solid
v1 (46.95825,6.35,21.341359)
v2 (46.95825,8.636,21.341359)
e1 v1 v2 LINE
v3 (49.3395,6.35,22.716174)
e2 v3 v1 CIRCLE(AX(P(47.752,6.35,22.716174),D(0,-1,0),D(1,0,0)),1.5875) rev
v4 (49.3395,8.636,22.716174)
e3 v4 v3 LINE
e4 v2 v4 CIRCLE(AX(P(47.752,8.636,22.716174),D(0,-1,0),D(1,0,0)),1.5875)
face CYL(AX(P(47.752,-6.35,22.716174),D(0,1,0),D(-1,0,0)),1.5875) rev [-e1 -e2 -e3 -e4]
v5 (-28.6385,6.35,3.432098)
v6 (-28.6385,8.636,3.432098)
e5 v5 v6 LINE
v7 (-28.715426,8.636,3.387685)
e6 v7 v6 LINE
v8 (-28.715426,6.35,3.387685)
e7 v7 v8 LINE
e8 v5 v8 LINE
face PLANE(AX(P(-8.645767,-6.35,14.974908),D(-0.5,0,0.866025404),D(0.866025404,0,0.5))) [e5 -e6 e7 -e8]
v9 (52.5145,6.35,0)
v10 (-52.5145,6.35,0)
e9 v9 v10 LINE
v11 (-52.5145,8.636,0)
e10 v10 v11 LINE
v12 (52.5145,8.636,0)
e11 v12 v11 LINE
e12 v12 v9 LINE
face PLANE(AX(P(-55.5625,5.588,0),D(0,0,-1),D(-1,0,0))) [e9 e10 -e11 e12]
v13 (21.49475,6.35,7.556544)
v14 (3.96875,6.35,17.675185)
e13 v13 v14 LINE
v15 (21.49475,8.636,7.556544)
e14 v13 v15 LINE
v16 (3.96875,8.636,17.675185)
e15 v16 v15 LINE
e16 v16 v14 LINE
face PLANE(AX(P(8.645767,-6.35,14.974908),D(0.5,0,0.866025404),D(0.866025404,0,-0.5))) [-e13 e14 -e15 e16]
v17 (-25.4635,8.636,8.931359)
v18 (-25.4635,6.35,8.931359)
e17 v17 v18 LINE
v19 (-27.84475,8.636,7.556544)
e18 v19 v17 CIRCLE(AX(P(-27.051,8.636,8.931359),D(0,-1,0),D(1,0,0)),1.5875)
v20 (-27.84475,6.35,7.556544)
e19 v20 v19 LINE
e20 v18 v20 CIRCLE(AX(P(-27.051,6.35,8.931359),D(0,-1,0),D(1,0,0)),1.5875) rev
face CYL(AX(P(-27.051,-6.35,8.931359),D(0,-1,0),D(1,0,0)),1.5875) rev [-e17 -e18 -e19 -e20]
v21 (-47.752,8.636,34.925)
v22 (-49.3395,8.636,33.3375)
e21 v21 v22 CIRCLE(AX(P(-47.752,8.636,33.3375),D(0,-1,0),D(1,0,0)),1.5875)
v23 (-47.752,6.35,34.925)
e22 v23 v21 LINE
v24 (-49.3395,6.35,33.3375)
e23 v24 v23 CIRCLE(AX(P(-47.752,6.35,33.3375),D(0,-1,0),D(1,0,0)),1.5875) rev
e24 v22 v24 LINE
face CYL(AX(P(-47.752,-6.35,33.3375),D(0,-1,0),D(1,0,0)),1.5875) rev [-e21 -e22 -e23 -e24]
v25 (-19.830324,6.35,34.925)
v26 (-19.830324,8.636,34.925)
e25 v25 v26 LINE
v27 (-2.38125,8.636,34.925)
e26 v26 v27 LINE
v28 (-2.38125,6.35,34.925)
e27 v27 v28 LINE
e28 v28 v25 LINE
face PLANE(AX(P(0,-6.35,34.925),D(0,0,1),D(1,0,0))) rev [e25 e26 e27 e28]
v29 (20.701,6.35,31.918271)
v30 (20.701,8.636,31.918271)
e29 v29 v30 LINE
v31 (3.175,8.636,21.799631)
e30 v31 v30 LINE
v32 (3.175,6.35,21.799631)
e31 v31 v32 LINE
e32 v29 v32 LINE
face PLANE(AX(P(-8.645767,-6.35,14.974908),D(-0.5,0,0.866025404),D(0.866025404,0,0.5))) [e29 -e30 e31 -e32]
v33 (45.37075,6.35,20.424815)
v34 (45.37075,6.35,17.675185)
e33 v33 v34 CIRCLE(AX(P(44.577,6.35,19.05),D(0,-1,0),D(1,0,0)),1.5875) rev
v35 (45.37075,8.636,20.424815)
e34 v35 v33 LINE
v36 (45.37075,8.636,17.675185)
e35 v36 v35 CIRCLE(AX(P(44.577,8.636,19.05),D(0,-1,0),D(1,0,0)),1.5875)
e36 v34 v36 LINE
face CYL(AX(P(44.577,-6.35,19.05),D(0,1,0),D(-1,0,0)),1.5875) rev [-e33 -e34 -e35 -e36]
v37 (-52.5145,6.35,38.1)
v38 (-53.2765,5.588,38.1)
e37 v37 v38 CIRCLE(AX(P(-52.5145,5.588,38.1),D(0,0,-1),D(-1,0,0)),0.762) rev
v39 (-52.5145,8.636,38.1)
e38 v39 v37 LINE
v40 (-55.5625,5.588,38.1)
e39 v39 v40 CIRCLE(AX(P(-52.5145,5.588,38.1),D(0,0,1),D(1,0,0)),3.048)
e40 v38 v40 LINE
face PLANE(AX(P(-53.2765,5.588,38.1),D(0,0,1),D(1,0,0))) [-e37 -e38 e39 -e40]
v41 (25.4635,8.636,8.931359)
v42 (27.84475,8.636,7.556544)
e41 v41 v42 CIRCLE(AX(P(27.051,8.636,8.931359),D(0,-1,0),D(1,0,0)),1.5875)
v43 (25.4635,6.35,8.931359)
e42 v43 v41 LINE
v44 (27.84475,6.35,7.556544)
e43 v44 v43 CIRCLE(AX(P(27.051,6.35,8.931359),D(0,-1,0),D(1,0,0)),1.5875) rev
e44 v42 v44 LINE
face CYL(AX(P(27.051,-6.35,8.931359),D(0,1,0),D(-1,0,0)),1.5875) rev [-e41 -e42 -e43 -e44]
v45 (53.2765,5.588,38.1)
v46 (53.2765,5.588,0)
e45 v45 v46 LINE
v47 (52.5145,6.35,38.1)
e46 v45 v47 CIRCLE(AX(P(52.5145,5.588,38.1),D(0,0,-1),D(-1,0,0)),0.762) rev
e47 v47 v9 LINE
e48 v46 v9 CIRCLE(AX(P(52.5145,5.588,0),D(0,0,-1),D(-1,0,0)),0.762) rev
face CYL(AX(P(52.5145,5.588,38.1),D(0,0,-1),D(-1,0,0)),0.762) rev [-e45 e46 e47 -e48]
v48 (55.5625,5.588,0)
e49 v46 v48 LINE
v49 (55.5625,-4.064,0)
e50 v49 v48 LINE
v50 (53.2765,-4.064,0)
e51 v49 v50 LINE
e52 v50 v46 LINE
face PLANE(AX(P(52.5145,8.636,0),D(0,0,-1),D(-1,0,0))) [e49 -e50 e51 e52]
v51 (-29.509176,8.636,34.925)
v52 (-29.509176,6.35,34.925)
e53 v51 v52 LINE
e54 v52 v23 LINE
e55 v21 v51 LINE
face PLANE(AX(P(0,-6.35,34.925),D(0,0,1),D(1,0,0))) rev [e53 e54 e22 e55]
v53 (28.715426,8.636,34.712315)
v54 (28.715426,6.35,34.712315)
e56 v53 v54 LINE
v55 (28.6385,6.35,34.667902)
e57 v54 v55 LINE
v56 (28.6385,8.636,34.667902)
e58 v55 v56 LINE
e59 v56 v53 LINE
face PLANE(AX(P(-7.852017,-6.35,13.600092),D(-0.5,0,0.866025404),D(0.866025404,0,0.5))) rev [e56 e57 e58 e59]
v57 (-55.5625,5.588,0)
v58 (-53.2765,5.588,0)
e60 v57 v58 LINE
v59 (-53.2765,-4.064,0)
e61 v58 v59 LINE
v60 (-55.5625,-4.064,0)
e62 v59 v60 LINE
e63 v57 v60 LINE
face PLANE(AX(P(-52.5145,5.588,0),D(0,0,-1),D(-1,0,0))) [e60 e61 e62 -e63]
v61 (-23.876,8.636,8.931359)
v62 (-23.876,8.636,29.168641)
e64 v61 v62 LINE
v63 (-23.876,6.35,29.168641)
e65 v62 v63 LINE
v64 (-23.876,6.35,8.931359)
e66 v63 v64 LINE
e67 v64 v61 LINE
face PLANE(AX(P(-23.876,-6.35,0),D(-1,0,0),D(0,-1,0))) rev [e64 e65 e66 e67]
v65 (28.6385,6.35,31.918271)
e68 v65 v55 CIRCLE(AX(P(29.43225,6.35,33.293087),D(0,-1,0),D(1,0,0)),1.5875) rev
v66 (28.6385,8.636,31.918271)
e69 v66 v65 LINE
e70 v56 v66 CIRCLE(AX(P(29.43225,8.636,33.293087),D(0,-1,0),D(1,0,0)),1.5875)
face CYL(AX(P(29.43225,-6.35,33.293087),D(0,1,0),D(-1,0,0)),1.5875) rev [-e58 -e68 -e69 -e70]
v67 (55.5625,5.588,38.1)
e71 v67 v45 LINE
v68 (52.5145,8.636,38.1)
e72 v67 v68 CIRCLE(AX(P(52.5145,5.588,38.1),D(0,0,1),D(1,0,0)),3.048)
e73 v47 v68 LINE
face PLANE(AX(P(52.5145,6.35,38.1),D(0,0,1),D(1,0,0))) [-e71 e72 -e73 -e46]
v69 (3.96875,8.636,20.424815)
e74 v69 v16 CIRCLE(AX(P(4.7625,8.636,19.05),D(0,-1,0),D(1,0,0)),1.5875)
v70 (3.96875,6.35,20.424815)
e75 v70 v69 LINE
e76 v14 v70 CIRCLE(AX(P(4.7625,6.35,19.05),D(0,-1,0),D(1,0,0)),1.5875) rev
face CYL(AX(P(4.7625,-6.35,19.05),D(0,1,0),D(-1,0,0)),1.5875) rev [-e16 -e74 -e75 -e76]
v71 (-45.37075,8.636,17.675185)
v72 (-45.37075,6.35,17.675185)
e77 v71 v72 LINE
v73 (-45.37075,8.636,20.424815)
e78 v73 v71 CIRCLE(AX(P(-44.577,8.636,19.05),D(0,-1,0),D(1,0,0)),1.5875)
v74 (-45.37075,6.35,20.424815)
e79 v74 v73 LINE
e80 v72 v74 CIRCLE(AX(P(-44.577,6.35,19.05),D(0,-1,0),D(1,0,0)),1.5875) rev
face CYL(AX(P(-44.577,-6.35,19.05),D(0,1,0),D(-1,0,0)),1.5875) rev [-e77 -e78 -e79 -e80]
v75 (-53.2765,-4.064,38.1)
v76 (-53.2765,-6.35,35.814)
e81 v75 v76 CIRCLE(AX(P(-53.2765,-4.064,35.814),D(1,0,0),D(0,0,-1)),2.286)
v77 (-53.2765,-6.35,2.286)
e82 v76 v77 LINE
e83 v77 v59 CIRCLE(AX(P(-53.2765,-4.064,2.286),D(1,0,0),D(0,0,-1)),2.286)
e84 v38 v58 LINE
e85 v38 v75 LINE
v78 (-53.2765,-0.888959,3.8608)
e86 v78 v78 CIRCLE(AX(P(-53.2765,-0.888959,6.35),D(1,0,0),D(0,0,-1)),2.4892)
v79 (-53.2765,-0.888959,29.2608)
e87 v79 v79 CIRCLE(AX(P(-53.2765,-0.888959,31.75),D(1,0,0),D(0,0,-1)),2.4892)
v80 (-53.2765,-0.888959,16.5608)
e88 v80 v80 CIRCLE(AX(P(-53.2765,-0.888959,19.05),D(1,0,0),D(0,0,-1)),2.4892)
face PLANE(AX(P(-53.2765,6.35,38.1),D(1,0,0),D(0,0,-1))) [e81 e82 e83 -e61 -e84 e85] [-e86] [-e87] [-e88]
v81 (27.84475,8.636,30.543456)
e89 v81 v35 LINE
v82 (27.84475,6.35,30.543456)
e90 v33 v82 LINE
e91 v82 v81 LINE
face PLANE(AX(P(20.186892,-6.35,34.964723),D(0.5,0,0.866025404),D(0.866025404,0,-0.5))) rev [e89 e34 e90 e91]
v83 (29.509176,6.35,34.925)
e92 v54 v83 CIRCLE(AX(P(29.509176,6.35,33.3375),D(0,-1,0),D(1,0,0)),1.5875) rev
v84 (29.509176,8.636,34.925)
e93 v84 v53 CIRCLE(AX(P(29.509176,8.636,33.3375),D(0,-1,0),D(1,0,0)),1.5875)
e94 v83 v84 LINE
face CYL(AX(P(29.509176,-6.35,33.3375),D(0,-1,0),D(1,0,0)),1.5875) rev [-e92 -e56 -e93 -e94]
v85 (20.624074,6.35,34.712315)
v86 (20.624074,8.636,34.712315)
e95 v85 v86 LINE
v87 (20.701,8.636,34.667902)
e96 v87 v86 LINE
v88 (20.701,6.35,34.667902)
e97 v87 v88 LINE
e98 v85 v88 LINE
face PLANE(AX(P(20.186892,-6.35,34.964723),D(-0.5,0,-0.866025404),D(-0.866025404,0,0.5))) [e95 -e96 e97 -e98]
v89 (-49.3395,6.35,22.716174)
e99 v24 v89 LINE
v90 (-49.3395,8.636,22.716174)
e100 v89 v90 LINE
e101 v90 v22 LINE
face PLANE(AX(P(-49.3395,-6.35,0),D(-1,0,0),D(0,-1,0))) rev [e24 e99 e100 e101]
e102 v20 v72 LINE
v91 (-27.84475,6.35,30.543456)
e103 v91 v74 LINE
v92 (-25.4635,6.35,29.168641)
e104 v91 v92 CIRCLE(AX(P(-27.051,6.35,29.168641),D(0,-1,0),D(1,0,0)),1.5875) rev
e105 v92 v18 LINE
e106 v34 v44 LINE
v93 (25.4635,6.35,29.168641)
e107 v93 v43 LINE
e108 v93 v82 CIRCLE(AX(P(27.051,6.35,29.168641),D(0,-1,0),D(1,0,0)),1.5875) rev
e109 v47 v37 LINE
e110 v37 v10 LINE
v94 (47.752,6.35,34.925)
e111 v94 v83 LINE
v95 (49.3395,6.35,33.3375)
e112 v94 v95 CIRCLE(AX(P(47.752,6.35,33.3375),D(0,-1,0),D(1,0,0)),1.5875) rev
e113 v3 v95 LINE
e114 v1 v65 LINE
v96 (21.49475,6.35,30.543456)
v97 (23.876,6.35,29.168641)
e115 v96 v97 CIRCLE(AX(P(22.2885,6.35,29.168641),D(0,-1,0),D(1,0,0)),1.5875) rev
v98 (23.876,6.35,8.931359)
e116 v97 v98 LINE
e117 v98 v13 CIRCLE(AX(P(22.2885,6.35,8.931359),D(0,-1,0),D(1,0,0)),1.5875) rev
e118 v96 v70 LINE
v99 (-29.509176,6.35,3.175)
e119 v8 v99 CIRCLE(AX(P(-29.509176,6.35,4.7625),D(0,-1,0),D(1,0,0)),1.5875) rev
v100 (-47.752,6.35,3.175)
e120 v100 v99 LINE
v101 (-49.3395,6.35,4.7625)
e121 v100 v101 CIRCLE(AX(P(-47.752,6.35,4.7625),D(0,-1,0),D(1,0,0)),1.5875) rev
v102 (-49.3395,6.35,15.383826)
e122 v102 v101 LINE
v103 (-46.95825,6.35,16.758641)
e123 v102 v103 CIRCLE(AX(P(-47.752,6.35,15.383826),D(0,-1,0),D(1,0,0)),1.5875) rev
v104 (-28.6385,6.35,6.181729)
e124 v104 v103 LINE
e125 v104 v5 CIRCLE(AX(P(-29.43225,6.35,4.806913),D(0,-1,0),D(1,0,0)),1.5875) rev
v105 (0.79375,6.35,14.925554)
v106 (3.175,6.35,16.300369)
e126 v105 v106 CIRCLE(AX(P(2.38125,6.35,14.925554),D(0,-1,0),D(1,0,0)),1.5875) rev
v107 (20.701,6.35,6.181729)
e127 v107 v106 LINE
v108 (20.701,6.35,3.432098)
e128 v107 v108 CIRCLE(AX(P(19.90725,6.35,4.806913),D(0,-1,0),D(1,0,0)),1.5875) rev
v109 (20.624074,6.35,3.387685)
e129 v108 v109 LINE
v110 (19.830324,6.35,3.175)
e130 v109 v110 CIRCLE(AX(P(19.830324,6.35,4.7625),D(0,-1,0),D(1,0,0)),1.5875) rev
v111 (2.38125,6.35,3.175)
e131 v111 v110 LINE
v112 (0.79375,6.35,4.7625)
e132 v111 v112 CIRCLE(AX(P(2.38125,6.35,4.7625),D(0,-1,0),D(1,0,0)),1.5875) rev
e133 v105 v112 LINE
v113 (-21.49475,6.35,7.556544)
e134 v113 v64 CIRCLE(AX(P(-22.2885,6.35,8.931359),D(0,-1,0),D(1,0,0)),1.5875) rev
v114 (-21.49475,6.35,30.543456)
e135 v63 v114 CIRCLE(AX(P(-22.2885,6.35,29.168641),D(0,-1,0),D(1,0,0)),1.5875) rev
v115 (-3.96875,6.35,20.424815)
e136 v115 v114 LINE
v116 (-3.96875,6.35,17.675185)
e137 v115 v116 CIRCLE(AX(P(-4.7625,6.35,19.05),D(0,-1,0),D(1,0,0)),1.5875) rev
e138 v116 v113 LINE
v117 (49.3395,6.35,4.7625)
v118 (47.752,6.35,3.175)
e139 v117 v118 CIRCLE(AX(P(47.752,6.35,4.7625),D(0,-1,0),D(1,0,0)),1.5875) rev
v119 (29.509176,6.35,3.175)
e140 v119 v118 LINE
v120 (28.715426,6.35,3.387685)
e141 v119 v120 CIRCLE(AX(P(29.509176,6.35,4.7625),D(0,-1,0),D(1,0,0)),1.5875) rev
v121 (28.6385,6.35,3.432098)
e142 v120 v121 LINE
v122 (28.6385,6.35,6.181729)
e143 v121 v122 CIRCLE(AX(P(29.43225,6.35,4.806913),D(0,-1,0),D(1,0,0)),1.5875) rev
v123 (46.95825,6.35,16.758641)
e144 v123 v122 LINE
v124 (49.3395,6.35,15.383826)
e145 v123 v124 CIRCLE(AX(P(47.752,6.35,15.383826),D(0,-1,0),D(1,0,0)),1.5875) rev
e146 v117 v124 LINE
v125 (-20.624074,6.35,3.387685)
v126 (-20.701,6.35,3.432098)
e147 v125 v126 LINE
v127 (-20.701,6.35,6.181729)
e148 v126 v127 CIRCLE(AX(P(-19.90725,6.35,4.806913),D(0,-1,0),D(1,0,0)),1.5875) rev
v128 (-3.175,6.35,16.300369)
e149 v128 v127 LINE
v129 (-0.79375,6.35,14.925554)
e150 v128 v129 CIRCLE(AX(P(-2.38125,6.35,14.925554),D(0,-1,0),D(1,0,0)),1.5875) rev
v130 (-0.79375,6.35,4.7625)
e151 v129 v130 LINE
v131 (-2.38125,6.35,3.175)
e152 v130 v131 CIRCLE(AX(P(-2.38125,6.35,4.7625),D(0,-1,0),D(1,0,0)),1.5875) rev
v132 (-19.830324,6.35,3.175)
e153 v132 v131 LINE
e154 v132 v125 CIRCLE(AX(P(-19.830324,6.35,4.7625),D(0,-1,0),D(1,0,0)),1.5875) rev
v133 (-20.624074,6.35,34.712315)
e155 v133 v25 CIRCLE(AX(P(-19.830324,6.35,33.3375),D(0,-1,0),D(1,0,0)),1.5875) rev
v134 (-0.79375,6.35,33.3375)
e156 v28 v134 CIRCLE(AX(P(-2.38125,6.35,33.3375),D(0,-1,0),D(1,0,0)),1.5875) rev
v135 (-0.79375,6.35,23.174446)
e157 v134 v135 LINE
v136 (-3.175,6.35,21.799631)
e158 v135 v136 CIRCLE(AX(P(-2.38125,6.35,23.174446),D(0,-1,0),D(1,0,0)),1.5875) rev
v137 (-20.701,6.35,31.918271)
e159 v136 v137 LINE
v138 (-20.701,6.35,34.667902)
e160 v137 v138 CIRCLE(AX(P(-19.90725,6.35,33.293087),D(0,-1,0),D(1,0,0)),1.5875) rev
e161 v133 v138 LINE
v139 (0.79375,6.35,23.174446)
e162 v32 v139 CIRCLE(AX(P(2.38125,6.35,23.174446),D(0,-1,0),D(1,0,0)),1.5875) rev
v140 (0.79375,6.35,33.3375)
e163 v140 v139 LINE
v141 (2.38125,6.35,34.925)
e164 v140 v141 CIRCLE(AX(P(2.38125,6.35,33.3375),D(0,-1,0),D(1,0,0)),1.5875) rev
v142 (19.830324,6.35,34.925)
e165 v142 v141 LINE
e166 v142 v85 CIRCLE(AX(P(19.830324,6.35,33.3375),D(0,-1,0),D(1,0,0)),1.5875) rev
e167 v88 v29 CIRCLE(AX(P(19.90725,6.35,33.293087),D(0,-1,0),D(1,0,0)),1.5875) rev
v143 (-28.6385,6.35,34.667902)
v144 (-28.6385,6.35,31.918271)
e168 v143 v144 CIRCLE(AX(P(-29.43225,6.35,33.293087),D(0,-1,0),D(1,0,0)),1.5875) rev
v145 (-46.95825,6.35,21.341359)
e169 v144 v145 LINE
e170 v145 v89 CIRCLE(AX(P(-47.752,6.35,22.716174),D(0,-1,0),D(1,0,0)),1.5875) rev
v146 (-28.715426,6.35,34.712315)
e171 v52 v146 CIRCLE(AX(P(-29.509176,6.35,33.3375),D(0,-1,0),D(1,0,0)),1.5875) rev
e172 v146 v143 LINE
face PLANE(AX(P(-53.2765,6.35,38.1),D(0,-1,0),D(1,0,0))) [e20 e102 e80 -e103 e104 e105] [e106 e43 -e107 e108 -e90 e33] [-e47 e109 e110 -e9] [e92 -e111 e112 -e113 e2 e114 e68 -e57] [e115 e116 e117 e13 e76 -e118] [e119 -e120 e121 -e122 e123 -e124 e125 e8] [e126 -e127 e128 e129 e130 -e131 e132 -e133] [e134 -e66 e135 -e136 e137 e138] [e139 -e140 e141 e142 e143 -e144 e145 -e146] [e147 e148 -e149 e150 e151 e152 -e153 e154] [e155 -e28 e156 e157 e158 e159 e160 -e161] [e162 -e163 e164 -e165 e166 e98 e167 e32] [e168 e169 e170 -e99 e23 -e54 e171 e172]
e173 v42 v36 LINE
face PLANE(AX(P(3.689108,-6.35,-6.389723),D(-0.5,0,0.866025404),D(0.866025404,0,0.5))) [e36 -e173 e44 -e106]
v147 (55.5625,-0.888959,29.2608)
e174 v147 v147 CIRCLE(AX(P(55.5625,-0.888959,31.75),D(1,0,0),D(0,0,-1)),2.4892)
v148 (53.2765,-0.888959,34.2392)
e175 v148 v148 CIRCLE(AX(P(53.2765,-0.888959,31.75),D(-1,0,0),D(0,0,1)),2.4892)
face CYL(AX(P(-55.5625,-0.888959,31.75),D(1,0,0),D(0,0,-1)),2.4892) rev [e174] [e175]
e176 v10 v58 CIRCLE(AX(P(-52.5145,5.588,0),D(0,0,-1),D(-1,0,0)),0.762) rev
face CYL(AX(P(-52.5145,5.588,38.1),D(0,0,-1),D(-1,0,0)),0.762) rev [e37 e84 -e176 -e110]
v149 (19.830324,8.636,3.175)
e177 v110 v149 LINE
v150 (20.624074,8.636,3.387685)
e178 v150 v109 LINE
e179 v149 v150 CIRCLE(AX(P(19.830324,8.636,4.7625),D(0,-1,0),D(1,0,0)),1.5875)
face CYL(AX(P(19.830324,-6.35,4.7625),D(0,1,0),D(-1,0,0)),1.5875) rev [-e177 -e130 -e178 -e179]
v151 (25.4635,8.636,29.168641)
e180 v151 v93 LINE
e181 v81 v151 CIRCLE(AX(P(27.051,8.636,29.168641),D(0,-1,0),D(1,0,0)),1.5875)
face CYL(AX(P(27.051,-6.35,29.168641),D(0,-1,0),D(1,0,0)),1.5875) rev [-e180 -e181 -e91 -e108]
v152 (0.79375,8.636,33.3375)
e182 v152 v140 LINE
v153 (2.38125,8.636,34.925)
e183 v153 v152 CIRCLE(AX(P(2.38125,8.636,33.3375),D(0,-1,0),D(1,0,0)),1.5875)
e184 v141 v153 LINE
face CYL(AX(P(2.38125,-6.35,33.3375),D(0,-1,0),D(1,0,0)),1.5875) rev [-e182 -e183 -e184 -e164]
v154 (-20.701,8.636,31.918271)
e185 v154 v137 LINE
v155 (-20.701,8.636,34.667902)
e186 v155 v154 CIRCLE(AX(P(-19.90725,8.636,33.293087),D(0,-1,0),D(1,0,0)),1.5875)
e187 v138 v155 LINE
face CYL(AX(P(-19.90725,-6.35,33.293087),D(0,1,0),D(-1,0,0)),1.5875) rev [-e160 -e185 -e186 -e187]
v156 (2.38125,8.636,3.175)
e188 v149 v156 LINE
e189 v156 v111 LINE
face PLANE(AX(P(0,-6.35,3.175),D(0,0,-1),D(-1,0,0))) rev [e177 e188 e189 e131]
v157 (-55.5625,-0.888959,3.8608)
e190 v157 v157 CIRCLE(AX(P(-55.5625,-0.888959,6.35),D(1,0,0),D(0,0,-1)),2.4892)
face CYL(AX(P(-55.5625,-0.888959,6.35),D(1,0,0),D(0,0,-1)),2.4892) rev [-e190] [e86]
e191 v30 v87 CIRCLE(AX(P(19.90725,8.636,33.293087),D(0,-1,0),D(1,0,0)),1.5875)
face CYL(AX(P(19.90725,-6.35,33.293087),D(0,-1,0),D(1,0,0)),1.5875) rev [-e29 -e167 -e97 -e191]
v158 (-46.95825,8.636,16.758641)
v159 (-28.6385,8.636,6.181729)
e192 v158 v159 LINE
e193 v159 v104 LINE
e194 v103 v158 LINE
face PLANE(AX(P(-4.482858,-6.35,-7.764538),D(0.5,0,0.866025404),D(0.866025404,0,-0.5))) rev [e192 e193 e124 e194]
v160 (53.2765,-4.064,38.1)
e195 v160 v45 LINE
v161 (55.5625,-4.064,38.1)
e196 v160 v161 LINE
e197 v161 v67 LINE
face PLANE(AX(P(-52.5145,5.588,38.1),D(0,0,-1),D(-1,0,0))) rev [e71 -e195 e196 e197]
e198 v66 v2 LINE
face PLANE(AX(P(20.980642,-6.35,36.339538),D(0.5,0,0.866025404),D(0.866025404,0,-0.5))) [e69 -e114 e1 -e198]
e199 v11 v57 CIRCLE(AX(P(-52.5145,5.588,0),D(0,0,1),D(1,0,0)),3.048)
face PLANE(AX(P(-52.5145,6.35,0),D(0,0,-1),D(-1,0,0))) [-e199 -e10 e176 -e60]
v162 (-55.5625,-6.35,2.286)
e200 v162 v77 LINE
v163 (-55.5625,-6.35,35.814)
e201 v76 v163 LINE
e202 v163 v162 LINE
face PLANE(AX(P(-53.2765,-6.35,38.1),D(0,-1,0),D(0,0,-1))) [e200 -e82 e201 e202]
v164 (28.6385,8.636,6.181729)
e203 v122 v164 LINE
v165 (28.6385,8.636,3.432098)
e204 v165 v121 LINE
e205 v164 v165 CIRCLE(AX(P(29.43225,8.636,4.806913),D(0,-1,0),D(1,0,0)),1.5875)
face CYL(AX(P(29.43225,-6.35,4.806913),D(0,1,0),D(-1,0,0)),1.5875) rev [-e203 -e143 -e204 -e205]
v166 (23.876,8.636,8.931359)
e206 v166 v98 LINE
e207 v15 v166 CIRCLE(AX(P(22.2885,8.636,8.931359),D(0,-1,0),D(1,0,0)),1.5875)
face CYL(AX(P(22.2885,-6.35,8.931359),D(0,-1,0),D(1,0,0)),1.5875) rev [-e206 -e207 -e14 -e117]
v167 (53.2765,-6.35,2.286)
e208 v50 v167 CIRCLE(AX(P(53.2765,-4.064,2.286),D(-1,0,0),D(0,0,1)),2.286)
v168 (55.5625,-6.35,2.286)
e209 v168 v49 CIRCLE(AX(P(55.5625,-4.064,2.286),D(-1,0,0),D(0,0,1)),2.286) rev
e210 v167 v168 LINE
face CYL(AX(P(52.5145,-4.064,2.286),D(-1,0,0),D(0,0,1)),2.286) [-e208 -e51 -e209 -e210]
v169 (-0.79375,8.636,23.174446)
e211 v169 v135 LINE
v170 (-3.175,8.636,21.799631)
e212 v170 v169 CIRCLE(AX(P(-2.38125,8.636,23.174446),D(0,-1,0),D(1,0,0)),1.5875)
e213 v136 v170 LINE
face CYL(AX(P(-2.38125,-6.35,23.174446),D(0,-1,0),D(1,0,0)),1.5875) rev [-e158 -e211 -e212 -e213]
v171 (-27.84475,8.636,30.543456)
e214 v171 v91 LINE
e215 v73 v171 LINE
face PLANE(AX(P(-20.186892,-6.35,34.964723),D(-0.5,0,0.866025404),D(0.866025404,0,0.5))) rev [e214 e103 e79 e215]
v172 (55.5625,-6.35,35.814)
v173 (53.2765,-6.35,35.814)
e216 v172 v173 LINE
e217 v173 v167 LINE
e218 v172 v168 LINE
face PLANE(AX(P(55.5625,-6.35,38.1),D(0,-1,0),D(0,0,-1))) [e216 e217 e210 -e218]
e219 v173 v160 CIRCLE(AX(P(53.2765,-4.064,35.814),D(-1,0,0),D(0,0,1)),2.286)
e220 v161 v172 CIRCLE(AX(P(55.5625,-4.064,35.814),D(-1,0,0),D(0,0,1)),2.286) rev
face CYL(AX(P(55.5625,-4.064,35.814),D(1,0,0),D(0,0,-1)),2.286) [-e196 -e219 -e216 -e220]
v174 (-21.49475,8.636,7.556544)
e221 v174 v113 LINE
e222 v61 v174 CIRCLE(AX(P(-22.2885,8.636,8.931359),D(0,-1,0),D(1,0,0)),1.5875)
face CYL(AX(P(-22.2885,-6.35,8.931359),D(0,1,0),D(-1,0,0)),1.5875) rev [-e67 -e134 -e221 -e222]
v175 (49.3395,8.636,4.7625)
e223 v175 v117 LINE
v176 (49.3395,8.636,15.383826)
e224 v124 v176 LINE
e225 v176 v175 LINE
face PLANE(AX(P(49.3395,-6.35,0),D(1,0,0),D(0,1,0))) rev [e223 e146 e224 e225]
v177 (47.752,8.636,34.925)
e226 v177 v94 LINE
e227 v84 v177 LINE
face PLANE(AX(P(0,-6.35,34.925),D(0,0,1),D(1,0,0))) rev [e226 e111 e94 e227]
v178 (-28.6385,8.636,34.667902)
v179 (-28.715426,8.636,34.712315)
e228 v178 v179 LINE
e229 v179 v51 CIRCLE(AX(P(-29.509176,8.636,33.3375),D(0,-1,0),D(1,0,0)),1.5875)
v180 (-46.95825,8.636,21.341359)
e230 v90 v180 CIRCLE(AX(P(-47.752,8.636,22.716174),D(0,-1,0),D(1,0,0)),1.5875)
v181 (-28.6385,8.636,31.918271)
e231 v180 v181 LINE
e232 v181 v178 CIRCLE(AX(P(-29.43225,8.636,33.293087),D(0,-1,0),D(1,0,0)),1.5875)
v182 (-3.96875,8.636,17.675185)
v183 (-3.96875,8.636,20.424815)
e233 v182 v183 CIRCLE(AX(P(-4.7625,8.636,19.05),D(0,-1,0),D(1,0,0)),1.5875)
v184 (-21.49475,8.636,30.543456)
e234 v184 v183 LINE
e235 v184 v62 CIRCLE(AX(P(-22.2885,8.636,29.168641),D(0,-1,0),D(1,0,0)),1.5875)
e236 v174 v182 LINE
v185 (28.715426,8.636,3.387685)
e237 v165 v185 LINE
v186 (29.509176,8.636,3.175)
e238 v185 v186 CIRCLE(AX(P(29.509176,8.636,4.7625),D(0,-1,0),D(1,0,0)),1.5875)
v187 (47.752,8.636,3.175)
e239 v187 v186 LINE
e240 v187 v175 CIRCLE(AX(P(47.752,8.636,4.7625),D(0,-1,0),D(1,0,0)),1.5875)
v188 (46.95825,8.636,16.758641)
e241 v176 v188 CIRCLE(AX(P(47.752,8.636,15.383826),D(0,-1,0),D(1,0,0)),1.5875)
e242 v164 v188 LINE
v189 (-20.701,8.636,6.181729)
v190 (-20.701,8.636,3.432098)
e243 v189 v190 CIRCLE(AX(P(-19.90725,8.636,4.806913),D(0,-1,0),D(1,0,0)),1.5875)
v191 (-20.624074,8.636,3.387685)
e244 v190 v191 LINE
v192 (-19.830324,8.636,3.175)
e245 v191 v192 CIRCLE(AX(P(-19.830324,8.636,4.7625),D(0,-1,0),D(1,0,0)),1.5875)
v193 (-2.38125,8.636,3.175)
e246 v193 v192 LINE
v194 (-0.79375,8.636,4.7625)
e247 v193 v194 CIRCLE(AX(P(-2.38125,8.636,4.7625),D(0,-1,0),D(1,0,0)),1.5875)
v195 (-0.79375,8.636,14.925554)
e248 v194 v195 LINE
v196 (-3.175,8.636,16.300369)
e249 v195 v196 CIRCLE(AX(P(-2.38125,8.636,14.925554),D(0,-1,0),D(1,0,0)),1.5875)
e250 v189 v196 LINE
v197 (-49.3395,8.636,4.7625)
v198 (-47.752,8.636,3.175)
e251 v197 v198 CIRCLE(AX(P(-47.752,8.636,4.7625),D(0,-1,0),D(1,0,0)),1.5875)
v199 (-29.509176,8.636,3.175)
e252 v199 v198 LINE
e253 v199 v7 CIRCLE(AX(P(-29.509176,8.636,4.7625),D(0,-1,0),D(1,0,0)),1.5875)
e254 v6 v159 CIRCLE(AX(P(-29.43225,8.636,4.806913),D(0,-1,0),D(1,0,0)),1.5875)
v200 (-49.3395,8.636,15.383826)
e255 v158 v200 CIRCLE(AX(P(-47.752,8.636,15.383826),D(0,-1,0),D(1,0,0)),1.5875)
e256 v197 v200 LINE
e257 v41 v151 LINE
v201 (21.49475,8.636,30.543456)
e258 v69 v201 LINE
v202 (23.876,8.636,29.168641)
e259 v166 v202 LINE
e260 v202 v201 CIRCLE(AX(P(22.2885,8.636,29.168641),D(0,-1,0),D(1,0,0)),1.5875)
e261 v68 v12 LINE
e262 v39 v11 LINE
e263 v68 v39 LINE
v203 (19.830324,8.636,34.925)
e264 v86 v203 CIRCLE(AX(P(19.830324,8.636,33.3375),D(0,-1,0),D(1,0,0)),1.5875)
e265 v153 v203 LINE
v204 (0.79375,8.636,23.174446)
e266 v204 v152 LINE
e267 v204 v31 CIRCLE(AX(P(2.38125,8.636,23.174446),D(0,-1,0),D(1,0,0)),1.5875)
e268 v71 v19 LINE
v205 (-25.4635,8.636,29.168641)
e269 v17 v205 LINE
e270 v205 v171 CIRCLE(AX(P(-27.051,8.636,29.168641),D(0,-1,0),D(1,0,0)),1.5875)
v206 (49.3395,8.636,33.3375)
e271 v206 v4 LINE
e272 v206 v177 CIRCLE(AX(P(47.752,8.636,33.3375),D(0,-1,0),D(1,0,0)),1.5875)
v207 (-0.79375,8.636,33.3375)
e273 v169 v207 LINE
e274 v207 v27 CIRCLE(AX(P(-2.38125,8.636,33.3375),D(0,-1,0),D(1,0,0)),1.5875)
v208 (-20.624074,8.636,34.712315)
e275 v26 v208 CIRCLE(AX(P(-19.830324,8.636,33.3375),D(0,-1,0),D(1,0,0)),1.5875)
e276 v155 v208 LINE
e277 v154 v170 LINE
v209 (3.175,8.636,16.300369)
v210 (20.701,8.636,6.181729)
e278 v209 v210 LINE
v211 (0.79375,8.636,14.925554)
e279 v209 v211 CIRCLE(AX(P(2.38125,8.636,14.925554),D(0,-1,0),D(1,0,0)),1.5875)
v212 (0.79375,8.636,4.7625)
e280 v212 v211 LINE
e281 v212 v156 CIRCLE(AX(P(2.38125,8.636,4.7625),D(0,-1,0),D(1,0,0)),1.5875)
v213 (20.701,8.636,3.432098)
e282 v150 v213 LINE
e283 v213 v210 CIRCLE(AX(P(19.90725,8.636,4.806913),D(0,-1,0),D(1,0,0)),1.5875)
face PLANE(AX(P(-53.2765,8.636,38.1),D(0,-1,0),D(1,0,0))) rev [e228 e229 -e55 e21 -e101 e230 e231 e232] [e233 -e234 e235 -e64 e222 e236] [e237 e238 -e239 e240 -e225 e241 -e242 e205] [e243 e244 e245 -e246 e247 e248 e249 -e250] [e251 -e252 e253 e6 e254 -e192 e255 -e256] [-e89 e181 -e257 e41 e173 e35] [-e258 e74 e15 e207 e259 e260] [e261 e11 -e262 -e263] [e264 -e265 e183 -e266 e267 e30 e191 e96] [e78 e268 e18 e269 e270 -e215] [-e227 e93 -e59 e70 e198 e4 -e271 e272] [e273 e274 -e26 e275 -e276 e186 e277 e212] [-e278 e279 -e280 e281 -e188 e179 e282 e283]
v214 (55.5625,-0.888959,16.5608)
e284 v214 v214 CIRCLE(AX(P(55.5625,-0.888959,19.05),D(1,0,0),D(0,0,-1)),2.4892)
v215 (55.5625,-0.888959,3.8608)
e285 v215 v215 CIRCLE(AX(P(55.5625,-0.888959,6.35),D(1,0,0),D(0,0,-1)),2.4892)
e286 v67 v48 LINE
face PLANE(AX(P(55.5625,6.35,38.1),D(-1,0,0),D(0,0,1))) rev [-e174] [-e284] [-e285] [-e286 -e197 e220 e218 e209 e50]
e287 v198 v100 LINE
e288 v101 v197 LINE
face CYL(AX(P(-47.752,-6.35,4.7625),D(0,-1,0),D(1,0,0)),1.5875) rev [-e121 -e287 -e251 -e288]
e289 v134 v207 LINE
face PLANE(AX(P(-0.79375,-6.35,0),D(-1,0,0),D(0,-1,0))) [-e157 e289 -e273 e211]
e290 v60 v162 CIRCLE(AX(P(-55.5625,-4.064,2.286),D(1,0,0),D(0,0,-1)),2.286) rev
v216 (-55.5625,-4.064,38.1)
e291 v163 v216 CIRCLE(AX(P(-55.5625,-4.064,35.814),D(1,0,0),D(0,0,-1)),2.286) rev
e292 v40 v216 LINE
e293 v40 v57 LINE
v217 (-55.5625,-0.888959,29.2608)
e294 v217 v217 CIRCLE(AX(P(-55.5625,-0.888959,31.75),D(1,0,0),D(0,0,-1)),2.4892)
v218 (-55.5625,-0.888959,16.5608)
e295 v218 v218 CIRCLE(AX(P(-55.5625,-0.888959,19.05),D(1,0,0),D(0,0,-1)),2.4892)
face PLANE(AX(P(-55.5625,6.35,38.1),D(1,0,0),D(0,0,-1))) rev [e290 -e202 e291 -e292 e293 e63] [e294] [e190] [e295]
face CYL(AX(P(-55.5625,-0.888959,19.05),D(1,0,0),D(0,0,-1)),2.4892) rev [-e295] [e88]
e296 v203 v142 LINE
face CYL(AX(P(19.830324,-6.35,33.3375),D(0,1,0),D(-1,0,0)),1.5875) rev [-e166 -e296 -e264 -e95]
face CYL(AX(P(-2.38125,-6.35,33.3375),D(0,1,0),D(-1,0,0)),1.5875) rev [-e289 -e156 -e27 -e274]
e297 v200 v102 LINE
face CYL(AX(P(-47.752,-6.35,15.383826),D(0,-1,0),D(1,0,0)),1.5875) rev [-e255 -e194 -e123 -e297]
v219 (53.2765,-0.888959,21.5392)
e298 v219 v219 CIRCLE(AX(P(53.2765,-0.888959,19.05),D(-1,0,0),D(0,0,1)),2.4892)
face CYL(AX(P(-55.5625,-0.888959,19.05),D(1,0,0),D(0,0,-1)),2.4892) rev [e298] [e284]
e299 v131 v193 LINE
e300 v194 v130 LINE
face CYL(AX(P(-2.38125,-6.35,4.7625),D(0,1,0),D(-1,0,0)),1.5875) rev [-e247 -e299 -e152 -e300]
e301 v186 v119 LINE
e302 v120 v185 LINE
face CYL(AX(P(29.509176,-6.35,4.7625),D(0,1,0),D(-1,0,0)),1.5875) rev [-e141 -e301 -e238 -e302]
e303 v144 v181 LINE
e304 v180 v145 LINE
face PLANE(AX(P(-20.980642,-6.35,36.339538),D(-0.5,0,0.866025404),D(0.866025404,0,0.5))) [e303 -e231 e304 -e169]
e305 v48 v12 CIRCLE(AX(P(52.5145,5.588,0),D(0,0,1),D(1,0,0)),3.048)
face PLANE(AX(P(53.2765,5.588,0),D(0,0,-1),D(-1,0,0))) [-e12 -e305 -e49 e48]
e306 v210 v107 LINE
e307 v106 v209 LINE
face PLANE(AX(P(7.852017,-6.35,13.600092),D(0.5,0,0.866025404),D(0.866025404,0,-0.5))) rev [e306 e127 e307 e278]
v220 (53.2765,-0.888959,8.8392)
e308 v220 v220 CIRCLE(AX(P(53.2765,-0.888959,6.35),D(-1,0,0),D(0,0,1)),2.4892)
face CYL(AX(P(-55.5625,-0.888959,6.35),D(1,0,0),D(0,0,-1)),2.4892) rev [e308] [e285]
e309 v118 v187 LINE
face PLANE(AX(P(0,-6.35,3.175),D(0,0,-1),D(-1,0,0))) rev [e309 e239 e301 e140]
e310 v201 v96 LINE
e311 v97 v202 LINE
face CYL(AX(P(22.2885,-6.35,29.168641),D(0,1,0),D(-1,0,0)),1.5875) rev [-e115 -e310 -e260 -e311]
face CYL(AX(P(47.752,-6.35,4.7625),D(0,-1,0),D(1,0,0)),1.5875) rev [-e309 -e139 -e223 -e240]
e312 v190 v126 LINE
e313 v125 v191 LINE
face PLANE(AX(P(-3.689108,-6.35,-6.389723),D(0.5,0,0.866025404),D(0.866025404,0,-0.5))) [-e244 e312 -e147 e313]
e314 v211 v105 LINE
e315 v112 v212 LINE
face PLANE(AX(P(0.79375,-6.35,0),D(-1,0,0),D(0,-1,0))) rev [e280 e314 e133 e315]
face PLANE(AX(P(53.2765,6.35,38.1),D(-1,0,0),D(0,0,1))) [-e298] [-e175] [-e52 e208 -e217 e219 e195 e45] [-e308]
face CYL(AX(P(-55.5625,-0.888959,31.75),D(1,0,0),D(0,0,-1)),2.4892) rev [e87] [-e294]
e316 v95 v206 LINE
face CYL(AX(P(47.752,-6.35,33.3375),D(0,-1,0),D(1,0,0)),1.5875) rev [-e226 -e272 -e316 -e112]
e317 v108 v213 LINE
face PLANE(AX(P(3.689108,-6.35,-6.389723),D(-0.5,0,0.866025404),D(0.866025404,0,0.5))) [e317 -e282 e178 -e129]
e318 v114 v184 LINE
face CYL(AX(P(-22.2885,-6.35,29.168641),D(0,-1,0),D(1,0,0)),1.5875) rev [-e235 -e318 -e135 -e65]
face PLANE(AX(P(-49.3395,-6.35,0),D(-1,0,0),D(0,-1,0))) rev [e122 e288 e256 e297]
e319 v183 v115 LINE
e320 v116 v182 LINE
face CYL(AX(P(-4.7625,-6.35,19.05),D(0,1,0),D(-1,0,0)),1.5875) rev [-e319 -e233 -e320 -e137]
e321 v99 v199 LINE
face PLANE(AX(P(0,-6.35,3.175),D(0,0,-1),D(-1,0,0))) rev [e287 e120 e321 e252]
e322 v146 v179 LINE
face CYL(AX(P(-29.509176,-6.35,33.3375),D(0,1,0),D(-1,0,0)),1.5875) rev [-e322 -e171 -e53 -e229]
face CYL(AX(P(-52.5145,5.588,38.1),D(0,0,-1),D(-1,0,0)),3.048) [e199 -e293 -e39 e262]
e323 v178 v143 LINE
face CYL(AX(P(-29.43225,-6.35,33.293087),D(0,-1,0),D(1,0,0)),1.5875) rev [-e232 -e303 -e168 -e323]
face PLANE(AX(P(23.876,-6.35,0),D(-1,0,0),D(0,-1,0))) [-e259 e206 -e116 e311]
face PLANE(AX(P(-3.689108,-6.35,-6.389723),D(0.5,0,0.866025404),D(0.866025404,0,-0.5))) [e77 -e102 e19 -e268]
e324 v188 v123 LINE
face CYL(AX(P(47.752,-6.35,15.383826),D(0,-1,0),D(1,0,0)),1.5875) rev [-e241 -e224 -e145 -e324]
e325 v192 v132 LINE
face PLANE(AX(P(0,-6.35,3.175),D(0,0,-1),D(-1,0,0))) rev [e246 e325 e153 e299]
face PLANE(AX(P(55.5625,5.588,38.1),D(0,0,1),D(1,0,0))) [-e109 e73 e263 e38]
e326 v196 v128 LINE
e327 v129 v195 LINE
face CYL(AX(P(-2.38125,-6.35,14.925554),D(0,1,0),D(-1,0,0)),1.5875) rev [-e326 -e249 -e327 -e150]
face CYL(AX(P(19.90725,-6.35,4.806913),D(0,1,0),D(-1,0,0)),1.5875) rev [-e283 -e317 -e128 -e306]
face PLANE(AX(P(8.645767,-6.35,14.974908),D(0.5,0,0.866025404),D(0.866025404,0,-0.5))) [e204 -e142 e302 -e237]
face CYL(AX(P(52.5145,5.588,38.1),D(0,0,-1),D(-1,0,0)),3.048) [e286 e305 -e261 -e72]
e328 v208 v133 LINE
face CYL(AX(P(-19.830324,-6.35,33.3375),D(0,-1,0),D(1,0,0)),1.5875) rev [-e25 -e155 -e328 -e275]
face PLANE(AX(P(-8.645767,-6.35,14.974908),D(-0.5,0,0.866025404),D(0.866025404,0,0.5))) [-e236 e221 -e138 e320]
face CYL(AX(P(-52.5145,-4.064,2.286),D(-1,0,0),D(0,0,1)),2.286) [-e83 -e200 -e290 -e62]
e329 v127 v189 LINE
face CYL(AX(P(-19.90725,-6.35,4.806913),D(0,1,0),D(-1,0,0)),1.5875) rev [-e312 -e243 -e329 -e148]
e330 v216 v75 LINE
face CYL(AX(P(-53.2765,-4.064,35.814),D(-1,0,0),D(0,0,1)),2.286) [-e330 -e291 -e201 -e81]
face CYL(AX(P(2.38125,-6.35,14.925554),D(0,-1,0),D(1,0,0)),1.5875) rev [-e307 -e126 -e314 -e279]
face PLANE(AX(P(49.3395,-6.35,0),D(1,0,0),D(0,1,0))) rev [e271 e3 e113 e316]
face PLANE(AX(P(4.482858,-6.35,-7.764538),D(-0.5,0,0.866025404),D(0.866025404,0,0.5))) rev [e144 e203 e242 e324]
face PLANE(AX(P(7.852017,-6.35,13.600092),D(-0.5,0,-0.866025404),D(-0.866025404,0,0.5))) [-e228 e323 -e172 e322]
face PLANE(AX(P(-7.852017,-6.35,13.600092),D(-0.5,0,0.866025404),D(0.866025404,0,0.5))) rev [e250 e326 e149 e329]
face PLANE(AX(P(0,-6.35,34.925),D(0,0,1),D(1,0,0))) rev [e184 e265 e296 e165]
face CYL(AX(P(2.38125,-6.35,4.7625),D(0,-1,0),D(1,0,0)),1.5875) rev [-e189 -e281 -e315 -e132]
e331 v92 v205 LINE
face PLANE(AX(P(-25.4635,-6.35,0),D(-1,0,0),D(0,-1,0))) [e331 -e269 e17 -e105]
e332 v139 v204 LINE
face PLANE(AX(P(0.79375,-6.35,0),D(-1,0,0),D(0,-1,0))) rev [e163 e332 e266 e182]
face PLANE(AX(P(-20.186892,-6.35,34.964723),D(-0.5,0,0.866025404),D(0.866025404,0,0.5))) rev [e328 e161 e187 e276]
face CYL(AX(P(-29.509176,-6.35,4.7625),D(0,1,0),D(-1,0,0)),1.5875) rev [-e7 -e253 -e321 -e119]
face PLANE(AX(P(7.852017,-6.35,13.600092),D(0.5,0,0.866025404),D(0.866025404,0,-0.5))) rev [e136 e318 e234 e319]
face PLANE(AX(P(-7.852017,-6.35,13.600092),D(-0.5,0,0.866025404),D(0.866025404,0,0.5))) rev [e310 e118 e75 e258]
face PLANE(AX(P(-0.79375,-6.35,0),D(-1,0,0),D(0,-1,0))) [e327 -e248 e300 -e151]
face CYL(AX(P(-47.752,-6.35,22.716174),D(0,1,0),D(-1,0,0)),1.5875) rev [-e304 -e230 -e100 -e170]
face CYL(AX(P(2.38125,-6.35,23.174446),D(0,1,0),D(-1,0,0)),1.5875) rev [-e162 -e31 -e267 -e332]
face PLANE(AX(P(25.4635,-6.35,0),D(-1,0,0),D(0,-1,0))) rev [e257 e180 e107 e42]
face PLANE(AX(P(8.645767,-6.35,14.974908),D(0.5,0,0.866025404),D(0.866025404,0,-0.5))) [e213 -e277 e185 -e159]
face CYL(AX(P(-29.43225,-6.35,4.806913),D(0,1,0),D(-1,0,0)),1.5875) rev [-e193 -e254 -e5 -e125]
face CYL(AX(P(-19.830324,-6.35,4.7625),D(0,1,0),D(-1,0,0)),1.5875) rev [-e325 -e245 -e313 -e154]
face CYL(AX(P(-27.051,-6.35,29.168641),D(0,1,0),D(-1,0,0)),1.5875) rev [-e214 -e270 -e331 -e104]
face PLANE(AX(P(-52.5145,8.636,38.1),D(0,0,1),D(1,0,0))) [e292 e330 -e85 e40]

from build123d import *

# Parameters (mm, degrees)
BASE_FLANGE1_DEPTH      = 38.1
CUT_EXTRUDE1_DEPTH      = 68.92188088
CUT_EXTRUDE1_DEPTH_BACK = 68.92188088
SKETCH6_R               = 2.4892
CUT_EXTRUDE2_DEPTH      = 70.01725583
FILLET1_R               = 1.5875
FILLET2_R               = 2.286


# Sheet-metal steps are written as plain solids
with BuildPart() as part:
    # Sketch1 → Base-Flange1 (new body)
    with BuildSketch(Plane.XY):
        with BuildLine():
            Line((-53.2765, -6.35), (-53.2765, 5.588))
            ThreePointArc((-53.2765, 5.588), (-53.053315367, 6.126815367), (-52.5145, 6.35))
            Line((-52.5145, 6.35), (52.5145, 6.35))
            ThreePointArc((52.5145, 6.35), (53.053315367, 6.126815367), (53.2765, 5.588))
            Line((53.2765, 5.588), (53.2765, -6.35))
            Line((53.2765, -6.35), (55.5625, -6.35))
            Line((55.5625, -6.35), (55.5625, 5.588))
            ThreePointArc((55.5625, 5.588), (54.669761469, 7.743261469), (52.5145, 8.636))
            Line((52.5145, 8.636), (-52.5145, 8.636))
            ThreePointArc((-52.5145, 8.636), (-54.669761469, 7.743261469), (-55.5625, 5.588))
            Line((-55.5625, 5.588), (-55.5625, -6.35))
            Line((-55.5625, -6.35), (-53.2765, -6.35))
        make_face()
    extrude(amount=BASE_FLANGE1_DEPTH)

    # Sketch6 → Cut-Extrude1 (cut, two sides: drawn at the far end of the back side and taken through both)
    with BuildSketch(Plane(origin=(0, 0, 0), x_dir=(0, 0, -1), z_dir=(1, 0, 0)).offset(-CUT_EXTRUDE1_DEPTH_BACK)):
        with Locations((6.35, -0.888959106)):
            Circle(SKETCH6_R)
        with Locations((-6.35, -0.888959106)):
            Circle(SKETCH6_R)
        with Locations((-19.05, -0.888959106)):
            Circle(SKETCH6_R)
        with Locations((-31.75, -0.888959106)):
            Circle(SKETCH6_R)
    extrude(amount=CUT_EXTRUDE1_DEPTH + CUT_EXTRUDE1_DEPTH_BACK, mode=Mode.SUBTRACT)

    # Sketch7 → Cut-Extrude2 (cut, through all)
    with BuildSketch(Plane(origin=(0, 8.636, 0), x_dir=(1, 0, 0), z_dir=(0, 1, 0))):
        Polygon((-26.25725, -4.806913197), (-29.08380657, -3.175), (-48.54575, -3.175), (-48.54575, -17.675184671), align=None)
        Polygon((-48.54575, -17.675184671), (-48.54575, -3.175), (-49.3395, -3.175), (-49.3395, -18.133456448), align=None)
        Polygon((-48.54575, -34.925), (-48.54575, -20.424815329), (-49.3395, -19.966543552), (-49.3395, -34.925), align=None)
        Polygon((-25.4635, -31.918271475), (-25.4635, -6.181728525), (-47.752, -19.05), align=None)
        Polygon((-27.89318157, -34.237592336), (-26.25725, -33.293086803), (-48.54575, -20.424815329), (-48.54575, -34.925), (-29.08380657, -34.925), align=None)
        Polygon((-23.876, -31.918271475), (-1.5875, -19.05), (-23.876, -6.181728525), align=None)
        Polygon((-0.79375, -17.675184671), (-0.79375, -3.175), (-20.25569343, -3.175), (-21.44631843, -3.862407664), (-23.08225, -4.806913197), align=None)
        Polygon((-0.79375, -34.925), (-0.79375, -20.424815329), (-23.08225, -33.293086803), (-21.44631843, -34.237592336), (-20.25569343, -34.925), align=None)
        Polygon((21.44631843, -3.862407664), (20.25569343, -3.175), (0.79375, -3.175), (0.79375, -17.675184671), (23.08225, -4.806913197), align=None)
        Polygon((23.876, -31.918271475), (23.876, -6.181728525), (1.5875, -19.05), align=None)
        Polygon((48.54575, -34.925), (48.54575, -20.424815329), (26.25725, -33.293086803), (27.89318157, -34.237592336), (29.08380657, -34.925), align=None)
        Polygon((25.4635, -31.918271475), (47.752, -19.05), (25.4635, -6.181728525), align=None)
        Polygon((48.54575, -17.675184671), (48.54575, -3.175), (29.08380657, -3.175), (26.25725, -4.806913197), align=None)
        Polygon((49.3395, -34.925), (49.3395, -19.966543552), (48.54575, -20.424815329), (48.54575, -34.925), align=None)
        Polygon((49.3395, -18.133456448), (49.3395, -3.175), (48.54575, -3.175), (48.54575, -17.675184671), align=None)
        Polygon((21.44631843, -34.237592336), (23.08225, -33.293086803), (0.79375, -20.424815329), (0.79375, -34.925), (20.25569343, -34.925), align=None)
    extrude(amount=-CUT_EXTRUDE2_DEPTH, mode=Mode.SUBTRACT)

    # Fillet1
    fillet1_edges = [part.edges().sort_by_distance(p)[0] for p in [
        (-20.25569343, 7.493, 34.925),
        (-23.08225, 7.493, 33.293086803),
        (-0.79375, 7.493, 20.424815329),
        (-0.79375, 7.493, 34.925),
        (20.25569343, 7.493, 3.175),
        (23.08225, 7.493, 4.806913197),
        (0.79375, 7.493, 17.675184671),
        (0.79375, 7.493, 3.175),
        (1.5875, 7.493, 19.05),
        (23.876, 7.493, 6.181728525),
        (23.876, 7.493, 31.918271475),
        (25.4635, 7.493, 31.918271475),
        (25.4635, 7.493, 6.181728525),
        (47.752, 7.493, 19.05),
        (-23.876, 7.493, 31.918271475),
        (-23.876, 7.493, 6.181728525),
        (-1.5875, 7.493, 19.05),
        (-23.08225, 7.493, 4.806913197),
        (-20.25569343, 7.493, 3.175),
        (-0.79375, 7.493, 3.175),
        (-0.79375, 7.493, 17.675184671),
        (-47.752, 7.493, 19.05),
        (-25.4635, 7.493, 6.181728525),
        (-25.4635, 7.493, 31.918271475),
        (-29.08380657, 7.493, 34.925),
        (-49.3395, 7.493, 34.925),
        (-49.3395, 7.493, 19.966543552),
        (-26.25725, 7.493, 33.293086803),
        (29.08380657, 7.493, 34.925),
        (26.25725, 7.493, 33.293086803),
        (49.3395, 7.493, 19.966543552),
        (49.3395, 7.493, 34.925),
        (26.25725, 7.493, 4.806913197),
        (29.08380657, 7.493, 3.175),
        (49.3395, 7.493, 3.175),
        (49.3395, 7.493, 18.133456448),
        (23.08225, 7.493, 33.293086803),
        (20.25569343, 7.493, 34.925),
        (0.79375, 7.493, 34.925),
        (0.79375, 7.493, 20.424815329),
        (-49.3395, 7.493, 3.175),
        (-29.08380657, 7.493, 3.175),
        (-26.25725, 7.493, 4.806913197),
        (-49.3395, 7.493, 18.133456448),
    ]]
    fillet(fillet1_edges, radius=FILLET1_R)

    # Fillet2
    fillet2_edges = [part.edges().sort_by_distance(p)[0] for p in [
        (54.4195, -6.35, 0),
        (-54.4195, -6.35, 0),
        (54.4195, -6.35, 38.1),
        (-54.4195, -6.35, 38.1),
    ]]
    fillet(fillet2_edges, radius=FILLET2_R)


solid = part.part
